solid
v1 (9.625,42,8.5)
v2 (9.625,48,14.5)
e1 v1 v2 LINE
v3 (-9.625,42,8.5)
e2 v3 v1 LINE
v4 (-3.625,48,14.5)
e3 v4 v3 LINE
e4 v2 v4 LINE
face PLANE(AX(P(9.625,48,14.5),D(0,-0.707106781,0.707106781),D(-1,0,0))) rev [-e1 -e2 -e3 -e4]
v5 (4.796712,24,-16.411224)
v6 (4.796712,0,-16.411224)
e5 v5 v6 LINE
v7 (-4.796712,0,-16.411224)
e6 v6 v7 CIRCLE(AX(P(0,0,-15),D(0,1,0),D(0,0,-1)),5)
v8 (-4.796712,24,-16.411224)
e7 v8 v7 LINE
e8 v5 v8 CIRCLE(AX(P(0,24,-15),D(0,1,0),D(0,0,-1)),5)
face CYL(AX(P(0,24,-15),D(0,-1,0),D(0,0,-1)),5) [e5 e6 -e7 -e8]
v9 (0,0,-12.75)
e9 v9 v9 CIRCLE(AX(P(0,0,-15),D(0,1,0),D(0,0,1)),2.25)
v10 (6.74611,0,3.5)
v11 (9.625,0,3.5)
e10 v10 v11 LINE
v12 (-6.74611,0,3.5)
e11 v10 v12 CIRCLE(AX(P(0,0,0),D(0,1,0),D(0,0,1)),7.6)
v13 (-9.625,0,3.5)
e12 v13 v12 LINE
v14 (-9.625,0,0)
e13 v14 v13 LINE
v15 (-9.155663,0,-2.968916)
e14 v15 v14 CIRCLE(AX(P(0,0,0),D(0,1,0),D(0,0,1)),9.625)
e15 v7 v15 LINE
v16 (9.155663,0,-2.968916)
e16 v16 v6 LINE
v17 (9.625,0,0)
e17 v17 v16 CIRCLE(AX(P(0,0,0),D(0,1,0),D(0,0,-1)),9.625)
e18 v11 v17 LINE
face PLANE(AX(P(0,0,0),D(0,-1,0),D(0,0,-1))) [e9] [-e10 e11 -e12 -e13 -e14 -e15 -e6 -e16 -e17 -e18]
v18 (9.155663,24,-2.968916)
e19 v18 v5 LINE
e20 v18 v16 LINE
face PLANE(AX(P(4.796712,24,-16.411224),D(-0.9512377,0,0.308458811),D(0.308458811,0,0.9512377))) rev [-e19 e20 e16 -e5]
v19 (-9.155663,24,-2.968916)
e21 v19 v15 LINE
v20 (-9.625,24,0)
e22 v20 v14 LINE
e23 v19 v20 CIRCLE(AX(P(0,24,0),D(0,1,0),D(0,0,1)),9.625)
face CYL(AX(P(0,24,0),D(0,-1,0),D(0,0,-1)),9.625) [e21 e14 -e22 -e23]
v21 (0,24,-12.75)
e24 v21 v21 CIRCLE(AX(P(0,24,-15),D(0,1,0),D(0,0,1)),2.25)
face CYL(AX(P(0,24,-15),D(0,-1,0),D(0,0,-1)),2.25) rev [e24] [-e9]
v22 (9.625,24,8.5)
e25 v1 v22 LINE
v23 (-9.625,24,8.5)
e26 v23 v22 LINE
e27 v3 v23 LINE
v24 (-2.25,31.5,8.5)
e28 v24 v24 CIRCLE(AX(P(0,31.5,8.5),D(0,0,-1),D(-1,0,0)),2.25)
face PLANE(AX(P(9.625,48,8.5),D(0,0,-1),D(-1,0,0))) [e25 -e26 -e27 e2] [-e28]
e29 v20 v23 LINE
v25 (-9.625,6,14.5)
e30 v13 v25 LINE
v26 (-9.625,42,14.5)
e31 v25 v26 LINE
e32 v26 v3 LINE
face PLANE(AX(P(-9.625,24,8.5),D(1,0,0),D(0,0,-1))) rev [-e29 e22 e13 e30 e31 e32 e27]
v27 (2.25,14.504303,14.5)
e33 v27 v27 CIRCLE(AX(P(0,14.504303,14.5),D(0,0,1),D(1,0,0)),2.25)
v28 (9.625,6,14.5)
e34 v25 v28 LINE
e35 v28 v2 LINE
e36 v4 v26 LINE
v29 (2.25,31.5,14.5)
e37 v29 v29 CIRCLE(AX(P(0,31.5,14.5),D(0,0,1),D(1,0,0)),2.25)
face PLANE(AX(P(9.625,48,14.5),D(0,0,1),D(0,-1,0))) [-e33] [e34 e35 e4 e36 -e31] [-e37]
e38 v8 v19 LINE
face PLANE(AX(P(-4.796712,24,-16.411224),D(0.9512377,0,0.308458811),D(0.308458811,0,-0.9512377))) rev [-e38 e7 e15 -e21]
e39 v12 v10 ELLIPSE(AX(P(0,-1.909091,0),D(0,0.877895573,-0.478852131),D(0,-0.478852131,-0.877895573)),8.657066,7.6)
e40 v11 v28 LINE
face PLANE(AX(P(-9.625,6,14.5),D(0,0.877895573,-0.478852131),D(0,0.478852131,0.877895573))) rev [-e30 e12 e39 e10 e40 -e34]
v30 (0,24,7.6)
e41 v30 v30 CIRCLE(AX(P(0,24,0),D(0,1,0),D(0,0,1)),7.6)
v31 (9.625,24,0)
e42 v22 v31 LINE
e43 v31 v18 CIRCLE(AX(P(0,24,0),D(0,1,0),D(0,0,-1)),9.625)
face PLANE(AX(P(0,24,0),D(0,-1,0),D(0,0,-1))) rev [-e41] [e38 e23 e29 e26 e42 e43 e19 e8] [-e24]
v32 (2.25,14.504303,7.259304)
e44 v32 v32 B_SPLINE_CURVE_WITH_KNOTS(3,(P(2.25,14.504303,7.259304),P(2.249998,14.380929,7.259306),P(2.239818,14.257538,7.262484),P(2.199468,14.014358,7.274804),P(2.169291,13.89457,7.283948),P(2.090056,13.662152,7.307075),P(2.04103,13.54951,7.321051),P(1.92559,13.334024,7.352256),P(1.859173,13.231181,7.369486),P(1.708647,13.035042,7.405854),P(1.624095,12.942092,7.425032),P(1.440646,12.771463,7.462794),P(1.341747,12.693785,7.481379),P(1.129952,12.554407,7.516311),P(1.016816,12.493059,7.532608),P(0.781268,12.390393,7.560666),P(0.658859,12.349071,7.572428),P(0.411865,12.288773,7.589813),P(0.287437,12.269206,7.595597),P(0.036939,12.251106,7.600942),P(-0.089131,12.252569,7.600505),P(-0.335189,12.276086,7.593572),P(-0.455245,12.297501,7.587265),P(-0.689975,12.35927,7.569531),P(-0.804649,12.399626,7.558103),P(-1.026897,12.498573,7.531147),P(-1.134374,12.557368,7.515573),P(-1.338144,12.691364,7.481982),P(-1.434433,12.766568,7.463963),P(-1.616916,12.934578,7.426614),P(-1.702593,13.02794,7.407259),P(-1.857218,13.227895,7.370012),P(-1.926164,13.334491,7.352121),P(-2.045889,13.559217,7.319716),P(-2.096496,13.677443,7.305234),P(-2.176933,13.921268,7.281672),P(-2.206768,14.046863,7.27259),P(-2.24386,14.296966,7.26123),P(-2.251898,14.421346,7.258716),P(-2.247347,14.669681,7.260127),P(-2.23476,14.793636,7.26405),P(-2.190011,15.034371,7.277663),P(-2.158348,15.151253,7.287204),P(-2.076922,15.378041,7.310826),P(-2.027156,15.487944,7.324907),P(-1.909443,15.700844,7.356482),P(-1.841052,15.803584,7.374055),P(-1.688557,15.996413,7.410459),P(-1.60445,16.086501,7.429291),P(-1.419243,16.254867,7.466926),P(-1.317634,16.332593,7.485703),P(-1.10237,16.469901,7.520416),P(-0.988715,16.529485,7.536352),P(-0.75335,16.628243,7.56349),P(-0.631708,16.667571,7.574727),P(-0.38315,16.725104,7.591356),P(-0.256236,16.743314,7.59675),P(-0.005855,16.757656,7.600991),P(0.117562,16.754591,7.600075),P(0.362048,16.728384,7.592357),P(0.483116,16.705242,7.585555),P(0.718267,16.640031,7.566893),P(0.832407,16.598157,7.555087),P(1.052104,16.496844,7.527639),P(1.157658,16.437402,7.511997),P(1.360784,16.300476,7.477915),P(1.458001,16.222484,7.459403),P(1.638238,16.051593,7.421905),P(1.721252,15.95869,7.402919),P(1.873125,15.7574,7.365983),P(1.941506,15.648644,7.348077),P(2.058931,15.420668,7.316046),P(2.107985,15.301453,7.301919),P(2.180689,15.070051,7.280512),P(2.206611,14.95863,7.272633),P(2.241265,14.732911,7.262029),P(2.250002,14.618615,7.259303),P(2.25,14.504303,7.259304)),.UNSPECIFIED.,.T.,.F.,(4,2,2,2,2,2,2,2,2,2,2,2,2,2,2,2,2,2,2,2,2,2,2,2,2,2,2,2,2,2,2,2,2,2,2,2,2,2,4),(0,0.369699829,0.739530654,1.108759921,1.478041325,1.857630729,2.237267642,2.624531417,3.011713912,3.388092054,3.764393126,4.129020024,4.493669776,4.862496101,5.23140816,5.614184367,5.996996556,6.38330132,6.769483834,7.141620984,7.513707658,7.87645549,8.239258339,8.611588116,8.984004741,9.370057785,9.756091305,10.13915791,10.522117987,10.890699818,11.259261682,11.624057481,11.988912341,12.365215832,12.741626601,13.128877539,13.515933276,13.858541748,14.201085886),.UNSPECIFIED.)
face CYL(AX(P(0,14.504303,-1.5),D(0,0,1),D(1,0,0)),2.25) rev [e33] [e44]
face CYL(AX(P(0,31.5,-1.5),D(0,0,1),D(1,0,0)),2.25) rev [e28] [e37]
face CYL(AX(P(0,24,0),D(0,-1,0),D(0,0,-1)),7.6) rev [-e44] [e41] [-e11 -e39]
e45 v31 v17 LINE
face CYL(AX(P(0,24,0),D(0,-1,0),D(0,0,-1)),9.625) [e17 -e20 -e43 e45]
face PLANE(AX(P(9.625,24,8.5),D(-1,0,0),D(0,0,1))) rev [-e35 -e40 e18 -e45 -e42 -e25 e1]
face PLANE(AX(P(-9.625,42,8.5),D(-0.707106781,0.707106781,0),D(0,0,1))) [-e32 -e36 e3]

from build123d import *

# Parameters (mm, degrees)
SKETCH1_R           = 7.6
SKETCH1_R_2         = 2.25
BOSS_EXTRUDE1_DEPTH = 24
BOSS_EXTRUDE2_DEPTH = 19.25
CUT_EXTRUDE1_DEPTH  = 56.448737587
CHAMFER1_SIZE       = 6
SKETCH6_R           = 2.25
CUT_EXTRUDE3_DEPTH  = 16
CHAMFER2_SIZE       = 6


with BuildPart() as part:
    # Sketch1 → Boss-Extrude1 (new body)
    with BuildSketch(Plane(origin=(0, 0, 0), x_dir=(1, 0, 0), z_dir=(0, 1, 0))):
        with BuildLine():
            Line((-9.625, -8.5), (9.625, -8.5))
            Line((9.625, -8.5), (9.625, 0))
            ThreePointArc((9.625, 0), (9.506941676, 1.502892202), (9.155662863, 2.968916054))
            Line((9.155662863, 2.968916054), (4.796712187, 16.411223653))
            ThreePointArc((4.796712187, 16.411223653), (0, 20), (-4.796712187, 16.411223653))
            Line((-4.796712187, 16.411223653), (-9.155662863, 2.968916054))
            ThreePointArc((-9.155662863, 2.968916054), (-9.506941676, 1.502892202), (-9.625, 0))
            Line((-9.625, 0), (-9.625, -8.5))
        make_face()
        with Locations(Location((0, 0, 0), (0, 0, 270))):
            Circle(SKETCH1_R, mode=Mode.SUBTRACT)
        with Locations(Location((0, 15, 0), (0, 0, 270))):
            Circle(SKETCH1_R_2, mode=Mode.SUBTRACT)
    extrude(amount=BOSS_EXTRUDE1_DEPTH)

    # Sketch3 → Boss-Extrude2 (add)
    with BuildSketch(Plane.ZY.offset(9.625)):
        Polygon((8.5, 0), (14.5, 0), (14.5, 48), (8.5, 48), (8.5, 24), align=None)
    extrude(amount=-BOSS_EXTRUDE2_DEPTH)

    # Sketch4 → Cut-Extrude1 (cut, through all)
    with BuildSketch(Plane(origin=(9.625, 0, 0), x_dir=(0, 0, -1), z_dir=(1, 0, 0))):
        Polygon((-14.5, 0), (-14.5, 6), (-3.5, 0), align=None)
    extrude(amount=-CUT_EXTRUDE1_DEPTH, mode=Mode.SUBTRACT)

    # Chamfer1
    chamfer1_edges = [part.edges().sort_by_distance(p)[0] for p in [
        (-9.625, 48, 11.5),
    ]]
    chamfer(chamfer1_edges, length=CHAMFER1_SIZE)

    # Sketch6 → Cut-Extrude3 (cut)
    with BuildSketch(Plane.XY.offset(14.5)):
        with Locations((0, 14.504303095)):
            Circle(SKETCH6_R)
        with Locations((0, 31.5)):
            Circle(SKETCH6_R)
    extrude(amount=-CUT_EXTRUDE3_DEPTH, mode=Mode.SUBTRACT)

    # Chamfer2
    chamfer2_edges = [part.edges().sort_by_distance(p)[0] for p in [
        (3, 48, 8.5),
    ]]
    chamfer(chamfer2_edges, length=CHAMFER2_SIZE - 0.0001)  # a hair under: the kernel refuses the full size


solid = part.part
